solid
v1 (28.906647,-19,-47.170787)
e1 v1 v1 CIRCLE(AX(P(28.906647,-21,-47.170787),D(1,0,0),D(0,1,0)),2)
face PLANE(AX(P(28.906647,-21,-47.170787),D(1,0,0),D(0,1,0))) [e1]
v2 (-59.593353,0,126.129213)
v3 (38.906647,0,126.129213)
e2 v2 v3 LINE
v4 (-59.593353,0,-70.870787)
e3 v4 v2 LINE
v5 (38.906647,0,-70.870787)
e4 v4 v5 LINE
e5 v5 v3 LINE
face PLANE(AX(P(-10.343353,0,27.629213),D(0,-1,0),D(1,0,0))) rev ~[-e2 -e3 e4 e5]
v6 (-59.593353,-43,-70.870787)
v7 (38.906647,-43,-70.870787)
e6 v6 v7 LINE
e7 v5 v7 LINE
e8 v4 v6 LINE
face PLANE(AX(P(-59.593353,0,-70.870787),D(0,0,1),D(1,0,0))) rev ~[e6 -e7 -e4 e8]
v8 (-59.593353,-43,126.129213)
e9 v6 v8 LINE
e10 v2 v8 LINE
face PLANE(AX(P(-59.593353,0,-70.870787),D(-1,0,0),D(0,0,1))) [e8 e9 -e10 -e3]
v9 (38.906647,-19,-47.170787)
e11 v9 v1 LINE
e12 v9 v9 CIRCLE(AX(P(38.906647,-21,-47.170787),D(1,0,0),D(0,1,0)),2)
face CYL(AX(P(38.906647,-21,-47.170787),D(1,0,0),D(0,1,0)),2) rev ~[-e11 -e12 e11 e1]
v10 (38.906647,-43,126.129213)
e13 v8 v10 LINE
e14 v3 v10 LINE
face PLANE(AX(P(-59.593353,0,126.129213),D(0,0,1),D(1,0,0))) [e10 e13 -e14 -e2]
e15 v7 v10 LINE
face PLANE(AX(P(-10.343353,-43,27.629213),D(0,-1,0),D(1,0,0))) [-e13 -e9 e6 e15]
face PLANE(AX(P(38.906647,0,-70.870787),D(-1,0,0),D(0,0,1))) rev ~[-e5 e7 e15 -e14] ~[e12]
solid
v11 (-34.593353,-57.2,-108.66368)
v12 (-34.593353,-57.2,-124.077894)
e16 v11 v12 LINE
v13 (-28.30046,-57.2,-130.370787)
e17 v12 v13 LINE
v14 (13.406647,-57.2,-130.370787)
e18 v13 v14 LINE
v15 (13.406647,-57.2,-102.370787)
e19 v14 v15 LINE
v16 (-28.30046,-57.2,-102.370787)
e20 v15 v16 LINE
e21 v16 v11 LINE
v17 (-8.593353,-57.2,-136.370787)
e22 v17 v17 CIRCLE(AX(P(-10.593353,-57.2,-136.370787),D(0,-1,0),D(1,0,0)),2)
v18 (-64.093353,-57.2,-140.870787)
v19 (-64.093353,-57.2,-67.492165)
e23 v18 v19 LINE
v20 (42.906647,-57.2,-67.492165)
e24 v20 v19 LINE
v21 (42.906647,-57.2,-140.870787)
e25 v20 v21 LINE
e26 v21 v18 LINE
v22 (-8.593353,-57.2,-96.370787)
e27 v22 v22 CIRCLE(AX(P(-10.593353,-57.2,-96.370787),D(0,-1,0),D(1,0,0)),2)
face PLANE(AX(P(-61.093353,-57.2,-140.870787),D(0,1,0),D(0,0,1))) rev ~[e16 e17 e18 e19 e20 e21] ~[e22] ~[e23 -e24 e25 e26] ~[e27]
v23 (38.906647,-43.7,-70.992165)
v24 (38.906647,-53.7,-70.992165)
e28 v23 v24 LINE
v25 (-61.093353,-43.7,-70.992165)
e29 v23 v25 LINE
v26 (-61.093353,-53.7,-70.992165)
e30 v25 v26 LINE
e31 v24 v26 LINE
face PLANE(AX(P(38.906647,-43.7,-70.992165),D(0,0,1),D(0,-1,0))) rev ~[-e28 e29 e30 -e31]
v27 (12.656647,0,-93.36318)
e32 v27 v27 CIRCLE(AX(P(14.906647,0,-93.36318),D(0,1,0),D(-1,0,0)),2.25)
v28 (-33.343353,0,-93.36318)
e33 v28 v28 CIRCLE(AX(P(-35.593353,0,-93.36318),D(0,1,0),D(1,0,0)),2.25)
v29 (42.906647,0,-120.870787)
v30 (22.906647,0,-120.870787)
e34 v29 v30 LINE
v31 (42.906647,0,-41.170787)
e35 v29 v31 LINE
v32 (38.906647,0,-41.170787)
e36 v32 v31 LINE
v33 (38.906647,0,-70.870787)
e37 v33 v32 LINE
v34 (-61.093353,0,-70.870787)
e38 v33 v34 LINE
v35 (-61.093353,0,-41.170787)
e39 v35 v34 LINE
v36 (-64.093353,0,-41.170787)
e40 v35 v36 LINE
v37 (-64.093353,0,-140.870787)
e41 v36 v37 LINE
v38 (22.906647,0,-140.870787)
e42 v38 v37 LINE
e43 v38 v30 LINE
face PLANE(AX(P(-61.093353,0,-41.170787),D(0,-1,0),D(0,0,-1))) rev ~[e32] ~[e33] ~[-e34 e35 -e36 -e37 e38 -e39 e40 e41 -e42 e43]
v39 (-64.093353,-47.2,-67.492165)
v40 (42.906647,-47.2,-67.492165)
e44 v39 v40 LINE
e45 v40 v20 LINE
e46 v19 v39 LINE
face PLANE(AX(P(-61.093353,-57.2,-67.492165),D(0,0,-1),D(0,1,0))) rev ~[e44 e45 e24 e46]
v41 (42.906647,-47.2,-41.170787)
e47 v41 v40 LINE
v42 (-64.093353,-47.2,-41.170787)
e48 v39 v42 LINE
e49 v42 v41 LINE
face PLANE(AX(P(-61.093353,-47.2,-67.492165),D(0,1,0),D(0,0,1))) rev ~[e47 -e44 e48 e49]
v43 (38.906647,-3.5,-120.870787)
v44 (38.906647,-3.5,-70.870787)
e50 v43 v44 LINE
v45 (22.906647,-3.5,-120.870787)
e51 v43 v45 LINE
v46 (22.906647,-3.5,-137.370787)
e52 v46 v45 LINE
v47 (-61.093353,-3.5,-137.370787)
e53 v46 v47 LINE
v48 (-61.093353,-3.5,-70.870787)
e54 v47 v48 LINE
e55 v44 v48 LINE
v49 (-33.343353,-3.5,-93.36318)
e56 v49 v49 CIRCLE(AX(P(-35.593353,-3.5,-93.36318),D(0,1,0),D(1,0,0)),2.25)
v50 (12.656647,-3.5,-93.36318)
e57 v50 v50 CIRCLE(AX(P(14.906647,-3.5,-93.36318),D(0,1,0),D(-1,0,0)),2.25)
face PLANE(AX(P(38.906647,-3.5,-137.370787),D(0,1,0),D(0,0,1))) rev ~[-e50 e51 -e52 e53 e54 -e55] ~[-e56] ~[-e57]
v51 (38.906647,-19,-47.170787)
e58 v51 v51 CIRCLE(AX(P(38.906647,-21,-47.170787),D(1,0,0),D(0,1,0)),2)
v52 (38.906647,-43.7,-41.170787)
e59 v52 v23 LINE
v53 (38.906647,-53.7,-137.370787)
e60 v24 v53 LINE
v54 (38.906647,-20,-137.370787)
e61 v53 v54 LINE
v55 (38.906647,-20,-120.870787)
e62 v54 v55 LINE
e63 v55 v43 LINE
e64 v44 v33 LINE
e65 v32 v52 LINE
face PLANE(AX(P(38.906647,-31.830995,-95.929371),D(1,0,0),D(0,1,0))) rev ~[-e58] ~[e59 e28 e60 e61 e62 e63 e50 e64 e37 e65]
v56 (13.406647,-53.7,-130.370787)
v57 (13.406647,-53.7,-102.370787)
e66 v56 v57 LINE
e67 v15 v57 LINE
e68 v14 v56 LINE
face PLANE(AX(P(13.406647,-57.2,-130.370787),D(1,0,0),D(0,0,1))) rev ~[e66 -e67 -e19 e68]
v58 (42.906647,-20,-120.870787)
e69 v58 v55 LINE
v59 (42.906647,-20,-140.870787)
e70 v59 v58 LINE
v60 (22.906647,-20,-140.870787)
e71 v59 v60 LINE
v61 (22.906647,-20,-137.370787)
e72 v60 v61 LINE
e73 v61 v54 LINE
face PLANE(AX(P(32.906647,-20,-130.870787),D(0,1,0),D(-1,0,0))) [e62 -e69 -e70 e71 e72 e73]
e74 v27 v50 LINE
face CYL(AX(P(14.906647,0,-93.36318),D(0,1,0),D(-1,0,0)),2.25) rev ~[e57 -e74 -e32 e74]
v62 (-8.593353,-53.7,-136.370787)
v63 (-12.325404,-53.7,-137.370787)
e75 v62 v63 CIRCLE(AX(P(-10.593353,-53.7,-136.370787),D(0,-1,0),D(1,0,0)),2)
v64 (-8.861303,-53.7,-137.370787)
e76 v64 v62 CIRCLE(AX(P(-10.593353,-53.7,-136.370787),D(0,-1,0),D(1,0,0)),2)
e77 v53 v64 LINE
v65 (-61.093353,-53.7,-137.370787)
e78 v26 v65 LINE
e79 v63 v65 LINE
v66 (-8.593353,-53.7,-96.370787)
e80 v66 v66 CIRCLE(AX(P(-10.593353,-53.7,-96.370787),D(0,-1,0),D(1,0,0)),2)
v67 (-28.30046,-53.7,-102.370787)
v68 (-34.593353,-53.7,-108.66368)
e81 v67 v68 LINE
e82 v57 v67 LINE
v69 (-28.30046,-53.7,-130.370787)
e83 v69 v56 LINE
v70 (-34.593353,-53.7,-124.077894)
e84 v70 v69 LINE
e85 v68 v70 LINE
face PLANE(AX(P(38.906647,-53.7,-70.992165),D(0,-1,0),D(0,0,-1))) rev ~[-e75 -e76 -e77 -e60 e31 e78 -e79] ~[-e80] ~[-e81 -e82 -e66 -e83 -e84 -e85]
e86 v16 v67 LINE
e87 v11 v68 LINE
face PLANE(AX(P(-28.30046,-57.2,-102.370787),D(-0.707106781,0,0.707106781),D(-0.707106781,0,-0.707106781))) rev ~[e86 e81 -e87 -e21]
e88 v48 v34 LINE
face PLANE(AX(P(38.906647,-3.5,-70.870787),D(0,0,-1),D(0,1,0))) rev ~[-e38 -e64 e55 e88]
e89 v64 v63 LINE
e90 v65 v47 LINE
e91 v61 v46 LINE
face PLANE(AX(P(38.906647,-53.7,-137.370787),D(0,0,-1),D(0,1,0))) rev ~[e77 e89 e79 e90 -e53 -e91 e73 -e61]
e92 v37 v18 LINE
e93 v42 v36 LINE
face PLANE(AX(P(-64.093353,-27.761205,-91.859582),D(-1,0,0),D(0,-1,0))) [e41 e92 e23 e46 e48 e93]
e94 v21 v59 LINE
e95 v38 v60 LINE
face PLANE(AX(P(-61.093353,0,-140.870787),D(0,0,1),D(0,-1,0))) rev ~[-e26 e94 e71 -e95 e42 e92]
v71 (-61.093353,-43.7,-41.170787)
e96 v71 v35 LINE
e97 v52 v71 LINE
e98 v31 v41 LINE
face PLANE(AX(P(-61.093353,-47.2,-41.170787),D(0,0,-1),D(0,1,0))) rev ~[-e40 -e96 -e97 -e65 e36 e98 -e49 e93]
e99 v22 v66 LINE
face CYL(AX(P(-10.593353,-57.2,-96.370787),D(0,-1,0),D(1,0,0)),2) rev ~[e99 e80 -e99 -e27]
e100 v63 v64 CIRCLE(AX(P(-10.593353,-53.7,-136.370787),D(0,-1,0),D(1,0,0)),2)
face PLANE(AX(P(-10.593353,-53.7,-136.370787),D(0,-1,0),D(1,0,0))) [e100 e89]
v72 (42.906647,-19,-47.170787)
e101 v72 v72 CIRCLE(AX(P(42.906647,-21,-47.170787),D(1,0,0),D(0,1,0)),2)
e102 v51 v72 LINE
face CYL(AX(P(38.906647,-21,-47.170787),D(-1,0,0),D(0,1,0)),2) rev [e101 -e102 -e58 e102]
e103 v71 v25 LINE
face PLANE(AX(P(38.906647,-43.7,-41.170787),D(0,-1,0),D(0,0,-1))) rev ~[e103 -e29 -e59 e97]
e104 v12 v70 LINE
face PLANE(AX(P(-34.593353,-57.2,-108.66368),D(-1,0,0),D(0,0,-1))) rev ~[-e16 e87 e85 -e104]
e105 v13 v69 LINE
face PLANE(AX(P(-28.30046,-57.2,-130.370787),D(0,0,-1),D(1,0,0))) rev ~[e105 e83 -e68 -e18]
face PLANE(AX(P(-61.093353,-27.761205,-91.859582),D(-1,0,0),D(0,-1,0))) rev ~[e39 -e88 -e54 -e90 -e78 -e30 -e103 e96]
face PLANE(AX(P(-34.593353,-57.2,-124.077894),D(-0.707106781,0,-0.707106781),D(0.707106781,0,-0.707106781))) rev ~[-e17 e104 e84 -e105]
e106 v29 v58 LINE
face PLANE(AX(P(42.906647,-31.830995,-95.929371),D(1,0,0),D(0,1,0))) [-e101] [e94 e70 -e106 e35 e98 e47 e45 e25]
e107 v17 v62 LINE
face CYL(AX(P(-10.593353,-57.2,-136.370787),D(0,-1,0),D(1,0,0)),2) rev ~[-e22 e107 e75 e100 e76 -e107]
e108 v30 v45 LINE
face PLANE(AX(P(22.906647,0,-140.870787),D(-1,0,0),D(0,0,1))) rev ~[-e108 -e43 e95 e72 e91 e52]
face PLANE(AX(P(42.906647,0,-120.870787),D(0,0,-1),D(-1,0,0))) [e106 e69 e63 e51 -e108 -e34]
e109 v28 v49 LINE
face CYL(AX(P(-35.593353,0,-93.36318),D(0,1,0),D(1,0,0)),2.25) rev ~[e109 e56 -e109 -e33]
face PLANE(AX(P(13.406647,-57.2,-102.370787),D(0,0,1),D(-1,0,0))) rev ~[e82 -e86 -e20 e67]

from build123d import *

# Parameters (mm, degrees)
F0_W      = 98.5
F0_H      = 197
F1_DEPTH  = 43
F2_R      = 2
F3_DEPTH  = 10
F4_W      = 43
F4_H      = 29.7
F4_R      = 2
F5_DEPTH  = 4
F7_DEPTH  = 100
F9_DEPTH  = 3
F10_R     = 2.25
F11_DEPTH = 3.5
F12_R     = 2
F13_DEPTH = 3.5
F14_W     = 20
F14_H     = 20
F15_DEPTH = 20


# Not quite as in the source:
# - a feature names something its author has since deleted; it is built from what else it names


with BuildPart() as f1:
    # F0 (on Front) → F1 (new body)
    with BuildSketch(Plane.XZ):
        with Locations((-10.3433534205, 27.6292130947)):
            Rectangle(F0_W, F0_H)
    extrude(amount=F1_DEPTH)

    # F2 (on face) → F3 (cut)
    with BuildSketch(Plane.YZ.offset(38.9066465795)):
        with Locations((-21, -47.1707869053)):
            Circle(F2_R)
    extrude(amount=-F3_DEPTH, mode=Mode.SUBTRACT)


with BuildPart() as f5:
    # F4 (on face) → F5 (new body)
    with BuildSketch(Plane.YZ.offset(38.9066465795)):
        Polygon((-43, -41.1707869053), (-47.2, -41.1707869053), (-47.2, -67.4921646714), (-57.2, -67.4921646714), (-57.2, -140.8707869053), (-47.2, -140.8707869053), (0, -140.8707869053), (0, -70.8707869053), (-43, -70.8707869053), align=None)
        with Locations((-21.5, -56.0207869053)):
            Rectangle(F4_W, F4_H)
        with Locations((-21, -47.1707869053)):
            Circle(F4_R, mode=Mode.SUBTRACT)
    extrude(amount=F5_DEPTH)

    # F6 (on face) → F7 (join)
    with BuildSketch(Plane(origin=(38.9066465795, 0, 0), x_dir=(0, -1, 0), z_dir=(-1, 0, 0))):
        Polygon((43.7, -41.1707869053), (43.7, -44.6707869053), (43.7, -70.9921646714), (53.7, -70.9921646714), (53.7, -137.3707869053), (3.5, -137.3707869053), (3.5, -70.8707869053), (0, -70.8707869053), (0, -140.8707869053), (57.2, -140.8707869053), (57.2, -67.4921646714), (47.2, -67.4921646714), (47.2, -41.1707869053), align=None)
    extrude(amount=F7_DEPTH)

    # F8 (on face) → F9 (join)
    with BuildSketch(Plane(origin=(-61.0933534205, 0, 0), x_dir=(0, -1, 0), z_dir=(-1, 0, 0))):
        Polygon((0, -41.1707869053), (0, -140.8707869053), (57.2, -140.8707869053), (57.2, -67.4921646714), (47.2, -67.4921646714), (47.2, -41.1707869053), (43.7, -41.1707869053), align=None)
    extrude(amount=F9_DEPTH)

    # F10 (on face) → F11 (cut, through all)
    with BuildSketch(Plane(origin=(0, 0, 0), x_dir=(-1, 0, 0), z_dir=(0, 1, 0))):
        with Locations((-14.9066465795, -93.3631800719)):
            Circle(F10_R)
        with BuildLine():
            ThreePointArc((37.8433534205, -93.3631800719), (35.5933534205, -91.1131800719), (33.3433534205, -93.3631800719))
            ThreePointArc((33.3433534205, -93.3631800719), (35.5933534205, -95.6131800719), (37.8433534205, -93.3631800719))
        make_face()
    extrude(amount=-F11_DEPTH, mode=Mode.SUBTRACT)

    # F12 (on face) → F13 (cut, through all)
    with BuildSketch(Plane.XZ.offset(57.2)):
        Polygon((-28.3004602017, -102.3707869053), (-34.5933534205, -108.6636801241), (-34.5933534205, -124.0778936865), (-28.3004602017, -130.3707869053), (13.4066465795, -130.3707869053), (13.4066465795, -102.3707869053), align=None)
        Polygon((-34.0933534205, -108.8707869053), (-28.0933534205, -102.8707869053), (12.9066465795, -102.8707869053), (12.9066465795, -129.8707869053), (-28.0933534205, -129.8707869053), (-34.0933534205, -123.8707869053), align=None, mode=Mode.SUBTRACT)
        Polygon((12.9066465795, -102.8707869053), (-28.0933534205, -102.8707869053), (-34.0933534205, -108.8707869053), (-34.0933534205, -123.8707869053), (-28.0933534205, -129.8707869053), (12.9066465795, -129.8707869053), align=None)
        with Locations((-10.5933534205, -136.3707869053)):
            Circle(F12_R)
        with Locations((-10.5933534205, -96.3707869053)):
            Circle(F12_R)
    extrude(amount=-F13_DEPTH, mode=Mode.SUBTRACT)

    # F14 (on face) → F15 (cut)
    with BuildSketch(Plane(origin=(0, 0, 0), x_dir=(-1, 0, 0), z_dir=(0, 1, 0))):
        with Locations((-32.9066465795, -130.8707869053)):
            Rectangle(F14_W, F14_H)
    extrude(amount=-F15_DEPTH, mode=Mode.SUBTRACT)


solid = Compound([f1.part, f5.part])
